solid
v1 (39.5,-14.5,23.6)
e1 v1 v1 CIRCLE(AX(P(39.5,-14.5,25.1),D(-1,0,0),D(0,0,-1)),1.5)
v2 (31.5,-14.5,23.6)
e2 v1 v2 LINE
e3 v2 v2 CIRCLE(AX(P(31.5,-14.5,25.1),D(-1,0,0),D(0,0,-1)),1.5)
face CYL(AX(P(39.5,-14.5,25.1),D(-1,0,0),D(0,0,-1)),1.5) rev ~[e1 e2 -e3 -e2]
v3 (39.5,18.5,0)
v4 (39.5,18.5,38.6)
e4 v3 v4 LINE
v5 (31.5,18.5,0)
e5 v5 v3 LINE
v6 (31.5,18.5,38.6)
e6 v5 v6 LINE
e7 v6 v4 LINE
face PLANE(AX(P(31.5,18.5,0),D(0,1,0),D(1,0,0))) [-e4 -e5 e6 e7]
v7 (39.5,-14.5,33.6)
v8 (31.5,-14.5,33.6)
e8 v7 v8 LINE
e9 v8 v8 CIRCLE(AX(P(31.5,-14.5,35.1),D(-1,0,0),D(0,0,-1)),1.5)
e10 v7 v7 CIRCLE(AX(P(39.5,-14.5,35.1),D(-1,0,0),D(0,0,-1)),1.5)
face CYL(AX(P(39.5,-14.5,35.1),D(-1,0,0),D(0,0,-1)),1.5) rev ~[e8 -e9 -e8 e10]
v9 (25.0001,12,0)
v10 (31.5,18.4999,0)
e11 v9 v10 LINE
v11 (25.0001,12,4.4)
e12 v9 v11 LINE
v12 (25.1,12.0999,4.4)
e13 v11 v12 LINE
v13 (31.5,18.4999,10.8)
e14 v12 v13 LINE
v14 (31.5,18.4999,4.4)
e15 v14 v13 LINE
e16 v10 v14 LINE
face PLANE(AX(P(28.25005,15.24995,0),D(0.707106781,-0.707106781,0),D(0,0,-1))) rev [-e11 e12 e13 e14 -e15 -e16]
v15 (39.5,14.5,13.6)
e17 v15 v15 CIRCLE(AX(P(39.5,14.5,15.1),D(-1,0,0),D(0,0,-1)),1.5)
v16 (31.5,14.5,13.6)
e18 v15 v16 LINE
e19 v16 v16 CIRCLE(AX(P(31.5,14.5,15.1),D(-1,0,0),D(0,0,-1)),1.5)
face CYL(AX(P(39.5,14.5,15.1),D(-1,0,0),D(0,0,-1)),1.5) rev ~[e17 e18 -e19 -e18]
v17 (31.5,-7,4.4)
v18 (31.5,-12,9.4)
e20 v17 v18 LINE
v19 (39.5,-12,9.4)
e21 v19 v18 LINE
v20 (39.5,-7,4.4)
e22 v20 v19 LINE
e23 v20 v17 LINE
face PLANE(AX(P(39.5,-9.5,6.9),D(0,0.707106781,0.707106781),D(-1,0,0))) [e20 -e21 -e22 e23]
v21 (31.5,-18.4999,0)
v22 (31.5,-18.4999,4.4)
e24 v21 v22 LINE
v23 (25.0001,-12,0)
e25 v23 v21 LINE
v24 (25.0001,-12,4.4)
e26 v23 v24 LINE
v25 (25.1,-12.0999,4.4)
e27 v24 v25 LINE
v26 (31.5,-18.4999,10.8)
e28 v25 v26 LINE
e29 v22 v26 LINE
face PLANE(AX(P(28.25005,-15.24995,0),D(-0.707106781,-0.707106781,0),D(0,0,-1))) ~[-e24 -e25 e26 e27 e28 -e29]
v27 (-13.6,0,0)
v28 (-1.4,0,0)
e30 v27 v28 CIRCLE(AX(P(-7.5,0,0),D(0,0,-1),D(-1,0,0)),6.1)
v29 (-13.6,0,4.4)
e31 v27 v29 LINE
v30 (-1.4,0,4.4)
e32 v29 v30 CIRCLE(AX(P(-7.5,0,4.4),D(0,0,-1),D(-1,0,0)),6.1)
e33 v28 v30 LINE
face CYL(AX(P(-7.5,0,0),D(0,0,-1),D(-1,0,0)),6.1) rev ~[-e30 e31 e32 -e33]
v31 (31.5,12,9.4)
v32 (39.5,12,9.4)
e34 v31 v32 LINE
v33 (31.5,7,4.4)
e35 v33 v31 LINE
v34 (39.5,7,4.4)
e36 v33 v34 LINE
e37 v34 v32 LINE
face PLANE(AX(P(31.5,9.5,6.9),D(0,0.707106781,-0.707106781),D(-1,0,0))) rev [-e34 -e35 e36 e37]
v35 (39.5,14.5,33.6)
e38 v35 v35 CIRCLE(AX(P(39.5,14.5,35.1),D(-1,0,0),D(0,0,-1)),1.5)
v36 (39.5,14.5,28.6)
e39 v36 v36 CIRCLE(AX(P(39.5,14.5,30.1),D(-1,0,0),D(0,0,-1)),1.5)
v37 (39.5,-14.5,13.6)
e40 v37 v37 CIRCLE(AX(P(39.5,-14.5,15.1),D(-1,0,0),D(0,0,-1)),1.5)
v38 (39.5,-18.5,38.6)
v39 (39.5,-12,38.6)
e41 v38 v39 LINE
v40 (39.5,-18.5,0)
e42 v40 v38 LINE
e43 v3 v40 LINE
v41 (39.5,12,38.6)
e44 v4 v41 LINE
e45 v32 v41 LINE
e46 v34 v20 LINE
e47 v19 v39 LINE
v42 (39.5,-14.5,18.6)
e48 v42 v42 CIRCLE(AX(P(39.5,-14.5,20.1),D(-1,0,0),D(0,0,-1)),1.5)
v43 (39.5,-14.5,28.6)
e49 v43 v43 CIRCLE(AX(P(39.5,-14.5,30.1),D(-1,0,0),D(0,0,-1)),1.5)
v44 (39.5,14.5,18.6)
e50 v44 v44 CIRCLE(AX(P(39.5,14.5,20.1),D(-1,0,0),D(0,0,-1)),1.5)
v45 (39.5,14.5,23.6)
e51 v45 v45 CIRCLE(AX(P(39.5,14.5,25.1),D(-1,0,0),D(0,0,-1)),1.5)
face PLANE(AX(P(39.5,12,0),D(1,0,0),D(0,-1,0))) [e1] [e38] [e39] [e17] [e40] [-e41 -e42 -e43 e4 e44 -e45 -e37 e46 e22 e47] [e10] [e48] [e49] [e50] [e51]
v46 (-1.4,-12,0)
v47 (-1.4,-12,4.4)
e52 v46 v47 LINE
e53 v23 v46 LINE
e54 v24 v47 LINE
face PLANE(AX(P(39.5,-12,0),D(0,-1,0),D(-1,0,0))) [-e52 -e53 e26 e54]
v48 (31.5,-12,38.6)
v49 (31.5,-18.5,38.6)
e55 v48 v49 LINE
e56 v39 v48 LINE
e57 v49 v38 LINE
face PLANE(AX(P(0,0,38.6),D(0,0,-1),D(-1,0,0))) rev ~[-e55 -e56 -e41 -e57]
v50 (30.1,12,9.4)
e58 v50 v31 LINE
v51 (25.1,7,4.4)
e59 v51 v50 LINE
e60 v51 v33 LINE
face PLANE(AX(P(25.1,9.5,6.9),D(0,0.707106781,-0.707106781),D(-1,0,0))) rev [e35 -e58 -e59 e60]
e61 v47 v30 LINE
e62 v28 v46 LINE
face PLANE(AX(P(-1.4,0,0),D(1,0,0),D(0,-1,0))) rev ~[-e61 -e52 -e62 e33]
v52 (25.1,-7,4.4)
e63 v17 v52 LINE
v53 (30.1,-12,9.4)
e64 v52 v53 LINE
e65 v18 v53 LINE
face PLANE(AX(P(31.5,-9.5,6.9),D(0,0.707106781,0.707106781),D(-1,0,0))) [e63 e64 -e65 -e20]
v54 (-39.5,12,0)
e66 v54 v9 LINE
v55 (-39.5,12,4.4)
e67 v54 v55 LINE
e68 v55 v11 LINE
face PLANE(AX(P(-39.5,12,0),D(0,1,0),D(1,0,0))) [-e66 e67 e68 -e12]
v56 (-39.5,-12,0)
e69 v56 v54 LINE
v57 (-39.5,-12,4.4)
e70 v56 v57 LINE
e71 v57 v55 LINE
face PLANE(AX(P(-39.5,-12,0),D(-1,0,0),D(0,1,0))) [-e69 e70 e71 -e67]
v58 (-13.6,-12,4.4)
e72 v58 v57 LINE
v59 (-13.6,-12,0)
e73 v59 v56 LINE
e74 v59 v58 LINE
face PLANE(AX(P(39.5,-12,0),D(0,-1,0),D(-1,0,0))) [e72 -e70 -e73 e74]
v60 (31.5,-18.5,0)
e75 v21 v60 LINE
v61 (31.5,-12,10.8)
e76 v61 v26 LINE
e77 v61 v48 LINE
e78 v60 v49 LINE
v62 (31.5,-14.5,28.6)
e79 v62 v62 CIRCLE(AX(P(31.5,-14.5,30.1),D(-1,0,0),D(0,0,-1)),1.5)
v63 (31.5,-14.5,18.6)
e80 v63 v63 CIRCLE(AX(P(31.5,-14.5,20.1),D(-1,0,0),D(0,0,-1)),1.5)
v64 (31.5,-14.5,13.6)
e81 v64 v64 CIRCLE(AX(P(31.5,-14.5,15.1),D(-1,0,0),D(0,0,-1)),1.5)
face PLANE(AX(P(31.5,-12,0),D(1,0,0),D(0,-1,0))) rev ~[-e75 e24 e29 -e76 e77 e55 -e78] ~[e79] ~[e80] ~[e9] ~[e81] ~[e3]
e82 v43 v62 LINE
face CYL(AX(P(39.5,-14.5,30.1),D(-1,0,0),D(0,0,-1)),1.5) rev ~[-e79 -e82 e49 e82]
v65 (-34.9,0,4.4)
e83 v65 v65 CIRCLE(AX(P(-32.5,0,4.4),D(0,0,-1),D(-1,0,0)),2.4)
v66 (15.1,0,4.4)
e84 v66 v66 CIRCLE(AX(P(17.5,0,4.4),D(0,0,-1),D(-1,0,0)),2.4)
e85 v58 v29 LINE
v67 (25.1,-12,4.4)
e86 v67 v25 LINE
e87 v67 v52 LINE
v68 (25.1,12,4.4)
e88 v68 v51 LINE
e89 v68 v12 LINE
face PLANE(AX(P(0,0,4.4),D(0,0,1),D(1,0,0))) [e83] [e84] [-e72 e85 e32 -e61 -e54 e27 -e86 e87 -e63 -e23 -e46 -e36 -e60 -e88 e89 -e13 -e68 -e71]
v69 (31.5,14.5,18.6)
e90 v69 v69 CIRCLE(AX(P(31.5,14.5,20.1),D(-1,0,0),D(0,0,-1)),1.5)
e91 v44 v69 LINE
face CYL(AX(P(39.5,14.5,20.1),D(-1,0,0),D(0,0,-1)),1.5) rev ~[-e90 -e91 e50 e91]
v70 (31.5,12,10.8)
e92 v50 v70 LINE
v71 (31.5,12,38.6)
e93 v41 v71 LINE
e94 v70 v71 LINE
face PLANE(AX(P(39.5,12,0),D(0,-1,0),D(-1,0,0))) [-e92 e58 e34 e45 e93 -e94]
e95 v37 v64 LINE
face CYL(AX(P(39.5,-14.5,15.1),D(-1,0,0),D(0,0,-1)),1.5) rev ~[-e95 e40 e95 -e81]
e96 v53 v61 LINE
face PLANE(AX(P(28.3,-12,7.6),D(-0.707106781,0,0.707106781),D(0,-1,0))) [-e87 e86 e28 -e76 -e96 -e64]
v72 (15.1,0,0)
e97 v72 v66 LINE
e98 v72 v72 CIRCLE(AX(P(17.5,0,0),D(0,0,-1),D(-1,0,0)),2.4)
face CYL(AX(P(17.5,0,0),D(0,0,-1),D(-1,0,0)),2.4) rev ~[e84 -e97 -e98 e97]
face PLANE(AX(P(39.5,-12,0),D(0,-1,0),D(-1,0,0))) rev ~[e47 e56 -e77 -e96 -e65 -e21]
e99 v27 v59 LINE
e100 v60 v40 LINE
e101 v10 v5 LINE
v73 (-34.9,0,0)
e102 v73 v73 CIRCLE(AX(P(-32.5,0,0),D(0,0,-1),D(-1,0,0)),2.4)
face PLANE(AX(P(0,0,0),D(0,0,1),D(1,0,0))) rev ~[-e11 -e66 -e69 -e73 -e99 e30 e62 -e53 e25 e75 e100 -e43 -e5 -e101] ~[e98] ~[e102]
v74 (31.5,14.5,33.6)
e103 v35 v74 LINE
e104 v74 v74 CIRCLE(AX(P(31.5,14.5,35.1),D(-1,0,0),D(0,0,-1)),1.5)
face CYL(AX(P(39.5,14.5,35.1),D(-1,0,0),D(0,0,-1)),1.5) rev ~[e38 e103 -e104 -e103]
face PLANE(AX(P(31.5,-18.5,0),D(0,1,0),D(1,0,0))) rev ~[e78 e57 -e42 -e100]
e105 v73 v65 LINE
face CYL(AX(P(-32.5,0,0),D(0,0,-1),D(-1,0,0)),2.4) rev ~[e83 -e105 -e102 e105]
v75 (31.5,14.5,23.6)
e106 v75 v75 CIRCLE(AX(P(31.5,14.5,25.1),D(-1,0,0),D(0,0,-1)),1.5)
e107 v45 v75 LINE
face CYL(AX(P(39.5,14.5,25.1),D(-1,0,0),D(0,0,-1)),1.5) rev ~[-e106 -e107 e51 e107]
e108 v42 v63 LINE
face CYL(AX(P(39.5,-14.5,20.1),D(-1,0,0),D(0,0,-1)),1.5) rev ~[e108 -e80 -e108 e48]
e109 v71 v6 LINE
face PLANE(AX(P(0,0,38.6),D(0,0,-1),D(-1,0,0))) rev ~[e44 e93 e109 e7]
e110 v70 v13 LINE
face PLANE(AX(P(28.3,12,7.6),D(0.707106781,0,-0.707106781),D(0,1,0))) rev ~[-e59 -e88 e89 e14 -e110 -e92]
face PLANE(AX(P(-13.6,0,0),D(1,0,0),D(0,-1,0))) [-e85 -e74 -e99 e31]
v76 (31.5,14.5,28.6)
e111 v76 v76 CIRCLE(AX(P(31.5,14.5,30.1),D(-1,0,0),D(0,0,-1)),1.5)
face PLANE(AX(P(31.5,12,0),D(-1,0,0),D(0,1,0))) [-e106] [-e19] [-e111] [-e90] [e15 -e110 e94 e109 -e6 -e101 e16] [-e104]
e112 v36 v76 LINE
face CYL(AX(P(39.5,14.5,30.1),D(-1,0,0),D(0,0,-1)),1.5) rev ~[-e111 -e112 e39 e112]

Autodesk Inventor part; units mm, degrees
ref_plane "YZ Plane" through (0, 0, 0) normal (1, 0, 0) x (0, 1, 0)
ref_plane "XZ Plane" through (0, 0, 0) normal (0, 1, 0) x (-1, 0, 0)
ref_plane "XY Plane" through (0, 0, 0) normal (0, 0, 1) x (1, 0, 0)
sketch "Sketch1" plane through (0, 0, 0) normal (0, 0, 1) x (1, 0, 0)
  line L0 (-39.5, 12) -> (39.5, 12)
  line L1 (39.5, 12) -> (39.5, -12)
  line L2 (39.5, -12) -> (-39.5, -12)
  line L3 (-39.5, -12) -> (-39.5, 12)
  line L4 (-39.5, 12) -> (39.5, -12) construction
  line L5 (39.5, 12) -> (-39.5, -12) construction
  point P0 (0, 0)
  dimension "d0" = 79
  dimension "d1" = 24
extrude "Extrusion1" add sketch "Sketch1" along normal blind 4.4
sketch "Sketch3" plane through (0, 0, 0) normal (0, 0, -1) x (-1, 0, 0)
  line L0 (-39.5, 12) -> (-31.5, 12)
  line L1 (-31.5, 12) -> (-31.5, 18.5)
  line L2 (-31.5, 18.5) -> (-39.5, 18.5)
  line L3 (-39.5, 18.5) -> (-39.5, 12)
  line L4 (-39.5, -12) -> (-31.5, -12)
  line L5 (-31.5, -12) -> (-31.5, -18.5)
  line L6 (-31.5, -18.5) -> (-39.5, -18.5)
  line L7 (-39.5, -18.5) -> (-39.5, -12)
  point P0 (0, 0)
  dimension "d8" = 8
  dimension "d9" = 6.5
  dimension "d10" = 6.5
extrude "Extrusion2" add sketch "Sketch3" against normal blind 38.6
chamfer "Chamfer1" distance 6.5 angle 45 2 edges at (31.5, -12, 2.2) (31.5, 12, 2.2)
sketch "Sketch5" plane through (0, 0, 0) normal (0, 0, -1) x (-1, 0, 0)
  line L0 (-25, -12) -> (39.5, -12) projected
  line L1 (39.5, 12) -> (-24.5, 12) construction
  line L2 (-24.5, 12) -> (-24.5, -12) construction
  line L3 (-24.5, -12) -> (39.5, -12) construction
  line L4 (39.5, -12) -> (39.5, 12) construction
  line L5 (-24.5, 12) -> (39.5, -12) construction
  line L6 (39.5, 12) -> (-24.5, -12) construction
  circle A0 centre (7.5, 0) radius 6.1
  line L7 (-17.5, 3) -> (32.5, 3) construction
  line L8 (32.5, 3) -> (32.5, -3) construction
  line L9 (32.5, -3) -> (-17.5, -3) construction
  line L10 (-17.5, -3) -> (-17.5, 3) construction
  line L11 (-17.5, 3) -> (32.5, -3) construction
  line L12 (32.5, 3) -> (-17.5, -3) construction
  circle A1 centre (-17.5, 0) radius 2.4
  circle A2 centre (32.5, 0) radius 2.4
  line L13 (1.4, 0) -> (1.4, -12)
  line L14 (13.6, 0) -> (13.6, -12)
  line L15 (13.6, -12) -> (1.4, -12)
  point P0 (0, 0)
  dimension "d29" = 64
  dimension "d30" = 12.2
  dimension "d31" = 50
  dimension "d32" = 4.8
  dimension "d33" = 4.8
extrude "Extrusion4" cut sketch "Sketch5" against normal blind 5.6
sketch "Sketch6" plane through (39.5, -18.5, 0) normal (1, 0, 0) x (0, 0, -1)
  line L0 (-38.6, 6.5) -> (-5.6, 6.5) construction
  line L1 (-5.6, 6.5) -> (-5.6, 1.5) construction
  line L2 (-5.6, 1.5) -> (-38.6, 1.5) construction
  line L3 (-38.6, 1.5) -> (-38.6, 6.5) construction
  line L4 (-38.6, 30.5) -> (-5.6, 30.5) construction
  line L5 (-5.6, 30.5) -> (-5.6, 35.5) construction
  line L6 (-5.6, 35.5) -> (-38.6, 35.5) construction
  line L7 (-38.6, 35.5) -> (-38.6, 30.5) construction
  line L8 (-38.6, 4) -> (-5.6, 4) construction
  line L9 (-38.6, 33) -> (-5.6, 33) construction
  line L10 (-38.6, 1.5) -> (-37.6, 1.5) construction
  line L11 (-37.6, 1.5) -> (-37.6, 6.5) construction
  line L12 (-37.6, 6.5) -> (-38.6, 6.5) construction
  line L13 (-38.6, 6.5) -> (-38.6, 1.5) construction
  line L14 (-37.6, 1.5) -> (-32.6, 1.5) construction
  line L15 (-32.6, 1.5) -> (-32.6, 6.5) construction
  line L16 (-32.6, 6.5) -> (-37.6, 6.5) construction
  line L17 (-37.6, 6.5) -> (-37.6, 1.5) construction
  line L18 (-38.6, 30.5) -> (-37.6, 30.5) construction
  line L19 (-37.6, 30.5) -> (-37.6, 35.5) construction
  line L20 (-37.6, 35.5) -> (-38.6, 35.5) construction
  line L21 (-38.6, 35.5) -> (-38.6, 30.5) construction
  line L22 (-37.6, 30.5) -> (-32.6, 30.5) construction
  line L23 (-32.6, 30.5) -> (-32.6, 35.5) construction
  line L24 (-32.6, 35.5) -> (-37.6, 35.5) construction
  line L25 (-37.6, 35.5) -> (-37.6, 30.5) construction
  line L26 (-37.6, 1.5) -> (-32.6, 6.5) construction
  line L27 (-37.6, 6.5) -> (-32.6, 1.5) construction
  line L28 (-37.6, 30.5) -> (-32.6, 35.5) construction
  line L29 (-37.6, 35.5) -> (-32.6, 30.5) construction
  line L30 (-38.6, 35.5) -> (-37.6, 35.5) construction
  line L31 (-37.6, 35.5) -> (-37.6, 30.5) construction
  line L32 (-37.6, 30.5) -> (-38.6, 30.5) construction
  line L33 (-38.6, 30.5) -> (-38.6, 35.5) construction
  line L34 (-4.4, 30.5) -> (-38.6, 30.5) projected
  line L35 (-32.6, 35.5) -> (-27.6, 35.5) construction
  line L36 (-27.6, 35.5) -> (-27.6, 30.5) construction
  line L37 (-27.6, 30.5) -> (-32.6, 30.5) construction
  line L38 (-32.6, 30.5) -> (-32.6, 35.5) construction
  line L39 (-27.6, 35.5) -> (-22.6, 35.5) construction
  line L40 (-22.6, 35.5) -> (-22.6, 30.5) construction
  line L41 (-22.6, 30.5) -> (-27.6, 30.5) construction
  line L42 (-27.6, 30.5) -> (-27.6, 35.5) construction
  line L43 (-32.6, 6.5) -> (-27.6, 6.5) construction
  line L44 (-27.6, 6.5) -> (-27.6, 1.5) construction
  line L45 (-27.6, 1.5) -> (-32.6, 1.5) construction
  line L46 (-32.6, 1.5) -> (-32.6, 6.5) construction
  line L47 (-27.6, 6.5) -> (-22.6, 6.5) construction
  line L48 (-22.6, 6.5) -> (-22.6, 1.5) construction
  line L49 (-22.6, 1.5) -> (-27.6, 1.5) construction
  line L50 (-27.6, 1.5) -> (-27.6, 6.5) construction
  line L51 (-22.6, 35.5) -> (-17.6, 35.5) construction
  line L52 (-17.6, 35.5) -> (-17.6, 30.5) construction
  line L53 (-17.6, 30.5) -> (-22.6, 30.5) construction
  line L54 (-22.6, 30.5) -> (-22.6, 35.5) construction
  line L55 (-22.6, 6.5) -> (-17.6, 6.5) construction
  line L56 (-17.6, 6.5) -> (-17.6, 1.5) construction
  line L57 (-17.6, 1.5) -> (-22.6, 1.5) construction
  line L58 (-22.6, 1.5) -> (-22.6, 6.5) construction
  line L59 (-17.6, 35.5) -> (-12.6, 35.5) construction
  line L60 (-12.6, 35.5) -> (-12.6, 30.5) construction
  line L61 (-12.6, 30.5) -> (-17.6, 30.5) construction
  line L62 (-17.6, 30.5) -> (-17.6, 35.5) construction
  line L63 (-17.6, 6.5) -> (-12.6, 6.5) construction
  line L64 (-12.6, 6.5) -> (-12.6, 1.5) construction
  line L65 (-12.6, 1.5) -> (-17.6, 1.5) construction
  line L66 (-17.6, 1.5) -> (-17.6, 6.5) construction
  line L67 (-32.6, 35.5) -> (-27.6, 30.5) construction
  line L68 (-27.6, 35.5) -> (-32.6, 30.5) construction
  line L69 (-27.6, 35.5) -> (-22.6, 30.5) construction
  line L70 (-27.6, 30.5) -> (-22.6, 35.5) construction
  line L71 (-22.6, 30.5) -> (-17.6, 35.5) construction
  line L72 (-22.6, 35.5) -> (-17.6, 30.5) construction
  line L73 (-17.6, 35.5) -> (-12.6, 30.5) construction
  line L74 (-12.6, 35.5) -> (-17.6, 30.5) construction
  line L75 (-17.6, 6.5) -> (-12.6, 1.5) construction
  line L76 (-12.6, 6.5) -> (-17.6, 1.5) construction
  line L77 (-22.6, 6.5) -> (-17.6, 1.5) construction
  line L78 (-17.6, 6.5) -> (-22.6, 1.5) construction
  line L79 (-27.6, 6.5) -> (-22.6, 1.5) construction
  line L80 (-22.6, 6.5) -> (-27.6, 1.5) construction
  line L81 (-32.6, 6.5) -> (-27.6, 1.5) construction
  line L82 (-27.6, 6.5) -> (-32.6, 1.5) construction
  point P0 (0, 18.5)
  point P1 (-35.1, 4)
  point P2 (-35.1, 33)
  point P3 (-30.1, 33)
  point P4 (-25.1, 33)
  point P5 (-20.1, 33)
  point P6 (-15.1, 33)
  point P7 (-15.1, 4)
  point P8 (-20.1, 4)
  point P9 (-25.1, 4)
  point P10 (-30.1, 4)
  dimension "d42" = 5
  dimension "d43" = 5
  dimension "d44" = 1
  dimension "d45" = 5
  dimension "d46" = 5
  dimension "d54" = 33
  dimension "d55" = 1
  dimension "d59" = 5
  dimension "d60" = 5
  dimension "d61" = 5
  dimension "d62" = 5
hole "Hole2" at (39.5, -14.5, 35.1) at (39.5, 14.5, 35.1) at (39.5, 14.5, 30.1) at (39.5, 14.5, 25.1) at (39.5, 14.5, 20.1) at (39.5, 14.5, 15.1) at (39.5, -14.5, 15.1) at (39.5, -14.5, 20.1) at (39.5, -14.5, 25.1) at (39.5, -14.5, 30.1) direction (-1, 0, 0) diameter 3 end through all
chamfer "Chamfer2" distance 6.4 angle 45 2 edges at (31.5, 15.25, 4.4) (31.5, -15.25, 4.4)
chamfer "Chamfer3" distance 5 angle 45 2 edges at (35.5, 12, 4.4) (35.5, -12, 4.4)
properties part number "Servo-Groove-Mount-J-Head"
